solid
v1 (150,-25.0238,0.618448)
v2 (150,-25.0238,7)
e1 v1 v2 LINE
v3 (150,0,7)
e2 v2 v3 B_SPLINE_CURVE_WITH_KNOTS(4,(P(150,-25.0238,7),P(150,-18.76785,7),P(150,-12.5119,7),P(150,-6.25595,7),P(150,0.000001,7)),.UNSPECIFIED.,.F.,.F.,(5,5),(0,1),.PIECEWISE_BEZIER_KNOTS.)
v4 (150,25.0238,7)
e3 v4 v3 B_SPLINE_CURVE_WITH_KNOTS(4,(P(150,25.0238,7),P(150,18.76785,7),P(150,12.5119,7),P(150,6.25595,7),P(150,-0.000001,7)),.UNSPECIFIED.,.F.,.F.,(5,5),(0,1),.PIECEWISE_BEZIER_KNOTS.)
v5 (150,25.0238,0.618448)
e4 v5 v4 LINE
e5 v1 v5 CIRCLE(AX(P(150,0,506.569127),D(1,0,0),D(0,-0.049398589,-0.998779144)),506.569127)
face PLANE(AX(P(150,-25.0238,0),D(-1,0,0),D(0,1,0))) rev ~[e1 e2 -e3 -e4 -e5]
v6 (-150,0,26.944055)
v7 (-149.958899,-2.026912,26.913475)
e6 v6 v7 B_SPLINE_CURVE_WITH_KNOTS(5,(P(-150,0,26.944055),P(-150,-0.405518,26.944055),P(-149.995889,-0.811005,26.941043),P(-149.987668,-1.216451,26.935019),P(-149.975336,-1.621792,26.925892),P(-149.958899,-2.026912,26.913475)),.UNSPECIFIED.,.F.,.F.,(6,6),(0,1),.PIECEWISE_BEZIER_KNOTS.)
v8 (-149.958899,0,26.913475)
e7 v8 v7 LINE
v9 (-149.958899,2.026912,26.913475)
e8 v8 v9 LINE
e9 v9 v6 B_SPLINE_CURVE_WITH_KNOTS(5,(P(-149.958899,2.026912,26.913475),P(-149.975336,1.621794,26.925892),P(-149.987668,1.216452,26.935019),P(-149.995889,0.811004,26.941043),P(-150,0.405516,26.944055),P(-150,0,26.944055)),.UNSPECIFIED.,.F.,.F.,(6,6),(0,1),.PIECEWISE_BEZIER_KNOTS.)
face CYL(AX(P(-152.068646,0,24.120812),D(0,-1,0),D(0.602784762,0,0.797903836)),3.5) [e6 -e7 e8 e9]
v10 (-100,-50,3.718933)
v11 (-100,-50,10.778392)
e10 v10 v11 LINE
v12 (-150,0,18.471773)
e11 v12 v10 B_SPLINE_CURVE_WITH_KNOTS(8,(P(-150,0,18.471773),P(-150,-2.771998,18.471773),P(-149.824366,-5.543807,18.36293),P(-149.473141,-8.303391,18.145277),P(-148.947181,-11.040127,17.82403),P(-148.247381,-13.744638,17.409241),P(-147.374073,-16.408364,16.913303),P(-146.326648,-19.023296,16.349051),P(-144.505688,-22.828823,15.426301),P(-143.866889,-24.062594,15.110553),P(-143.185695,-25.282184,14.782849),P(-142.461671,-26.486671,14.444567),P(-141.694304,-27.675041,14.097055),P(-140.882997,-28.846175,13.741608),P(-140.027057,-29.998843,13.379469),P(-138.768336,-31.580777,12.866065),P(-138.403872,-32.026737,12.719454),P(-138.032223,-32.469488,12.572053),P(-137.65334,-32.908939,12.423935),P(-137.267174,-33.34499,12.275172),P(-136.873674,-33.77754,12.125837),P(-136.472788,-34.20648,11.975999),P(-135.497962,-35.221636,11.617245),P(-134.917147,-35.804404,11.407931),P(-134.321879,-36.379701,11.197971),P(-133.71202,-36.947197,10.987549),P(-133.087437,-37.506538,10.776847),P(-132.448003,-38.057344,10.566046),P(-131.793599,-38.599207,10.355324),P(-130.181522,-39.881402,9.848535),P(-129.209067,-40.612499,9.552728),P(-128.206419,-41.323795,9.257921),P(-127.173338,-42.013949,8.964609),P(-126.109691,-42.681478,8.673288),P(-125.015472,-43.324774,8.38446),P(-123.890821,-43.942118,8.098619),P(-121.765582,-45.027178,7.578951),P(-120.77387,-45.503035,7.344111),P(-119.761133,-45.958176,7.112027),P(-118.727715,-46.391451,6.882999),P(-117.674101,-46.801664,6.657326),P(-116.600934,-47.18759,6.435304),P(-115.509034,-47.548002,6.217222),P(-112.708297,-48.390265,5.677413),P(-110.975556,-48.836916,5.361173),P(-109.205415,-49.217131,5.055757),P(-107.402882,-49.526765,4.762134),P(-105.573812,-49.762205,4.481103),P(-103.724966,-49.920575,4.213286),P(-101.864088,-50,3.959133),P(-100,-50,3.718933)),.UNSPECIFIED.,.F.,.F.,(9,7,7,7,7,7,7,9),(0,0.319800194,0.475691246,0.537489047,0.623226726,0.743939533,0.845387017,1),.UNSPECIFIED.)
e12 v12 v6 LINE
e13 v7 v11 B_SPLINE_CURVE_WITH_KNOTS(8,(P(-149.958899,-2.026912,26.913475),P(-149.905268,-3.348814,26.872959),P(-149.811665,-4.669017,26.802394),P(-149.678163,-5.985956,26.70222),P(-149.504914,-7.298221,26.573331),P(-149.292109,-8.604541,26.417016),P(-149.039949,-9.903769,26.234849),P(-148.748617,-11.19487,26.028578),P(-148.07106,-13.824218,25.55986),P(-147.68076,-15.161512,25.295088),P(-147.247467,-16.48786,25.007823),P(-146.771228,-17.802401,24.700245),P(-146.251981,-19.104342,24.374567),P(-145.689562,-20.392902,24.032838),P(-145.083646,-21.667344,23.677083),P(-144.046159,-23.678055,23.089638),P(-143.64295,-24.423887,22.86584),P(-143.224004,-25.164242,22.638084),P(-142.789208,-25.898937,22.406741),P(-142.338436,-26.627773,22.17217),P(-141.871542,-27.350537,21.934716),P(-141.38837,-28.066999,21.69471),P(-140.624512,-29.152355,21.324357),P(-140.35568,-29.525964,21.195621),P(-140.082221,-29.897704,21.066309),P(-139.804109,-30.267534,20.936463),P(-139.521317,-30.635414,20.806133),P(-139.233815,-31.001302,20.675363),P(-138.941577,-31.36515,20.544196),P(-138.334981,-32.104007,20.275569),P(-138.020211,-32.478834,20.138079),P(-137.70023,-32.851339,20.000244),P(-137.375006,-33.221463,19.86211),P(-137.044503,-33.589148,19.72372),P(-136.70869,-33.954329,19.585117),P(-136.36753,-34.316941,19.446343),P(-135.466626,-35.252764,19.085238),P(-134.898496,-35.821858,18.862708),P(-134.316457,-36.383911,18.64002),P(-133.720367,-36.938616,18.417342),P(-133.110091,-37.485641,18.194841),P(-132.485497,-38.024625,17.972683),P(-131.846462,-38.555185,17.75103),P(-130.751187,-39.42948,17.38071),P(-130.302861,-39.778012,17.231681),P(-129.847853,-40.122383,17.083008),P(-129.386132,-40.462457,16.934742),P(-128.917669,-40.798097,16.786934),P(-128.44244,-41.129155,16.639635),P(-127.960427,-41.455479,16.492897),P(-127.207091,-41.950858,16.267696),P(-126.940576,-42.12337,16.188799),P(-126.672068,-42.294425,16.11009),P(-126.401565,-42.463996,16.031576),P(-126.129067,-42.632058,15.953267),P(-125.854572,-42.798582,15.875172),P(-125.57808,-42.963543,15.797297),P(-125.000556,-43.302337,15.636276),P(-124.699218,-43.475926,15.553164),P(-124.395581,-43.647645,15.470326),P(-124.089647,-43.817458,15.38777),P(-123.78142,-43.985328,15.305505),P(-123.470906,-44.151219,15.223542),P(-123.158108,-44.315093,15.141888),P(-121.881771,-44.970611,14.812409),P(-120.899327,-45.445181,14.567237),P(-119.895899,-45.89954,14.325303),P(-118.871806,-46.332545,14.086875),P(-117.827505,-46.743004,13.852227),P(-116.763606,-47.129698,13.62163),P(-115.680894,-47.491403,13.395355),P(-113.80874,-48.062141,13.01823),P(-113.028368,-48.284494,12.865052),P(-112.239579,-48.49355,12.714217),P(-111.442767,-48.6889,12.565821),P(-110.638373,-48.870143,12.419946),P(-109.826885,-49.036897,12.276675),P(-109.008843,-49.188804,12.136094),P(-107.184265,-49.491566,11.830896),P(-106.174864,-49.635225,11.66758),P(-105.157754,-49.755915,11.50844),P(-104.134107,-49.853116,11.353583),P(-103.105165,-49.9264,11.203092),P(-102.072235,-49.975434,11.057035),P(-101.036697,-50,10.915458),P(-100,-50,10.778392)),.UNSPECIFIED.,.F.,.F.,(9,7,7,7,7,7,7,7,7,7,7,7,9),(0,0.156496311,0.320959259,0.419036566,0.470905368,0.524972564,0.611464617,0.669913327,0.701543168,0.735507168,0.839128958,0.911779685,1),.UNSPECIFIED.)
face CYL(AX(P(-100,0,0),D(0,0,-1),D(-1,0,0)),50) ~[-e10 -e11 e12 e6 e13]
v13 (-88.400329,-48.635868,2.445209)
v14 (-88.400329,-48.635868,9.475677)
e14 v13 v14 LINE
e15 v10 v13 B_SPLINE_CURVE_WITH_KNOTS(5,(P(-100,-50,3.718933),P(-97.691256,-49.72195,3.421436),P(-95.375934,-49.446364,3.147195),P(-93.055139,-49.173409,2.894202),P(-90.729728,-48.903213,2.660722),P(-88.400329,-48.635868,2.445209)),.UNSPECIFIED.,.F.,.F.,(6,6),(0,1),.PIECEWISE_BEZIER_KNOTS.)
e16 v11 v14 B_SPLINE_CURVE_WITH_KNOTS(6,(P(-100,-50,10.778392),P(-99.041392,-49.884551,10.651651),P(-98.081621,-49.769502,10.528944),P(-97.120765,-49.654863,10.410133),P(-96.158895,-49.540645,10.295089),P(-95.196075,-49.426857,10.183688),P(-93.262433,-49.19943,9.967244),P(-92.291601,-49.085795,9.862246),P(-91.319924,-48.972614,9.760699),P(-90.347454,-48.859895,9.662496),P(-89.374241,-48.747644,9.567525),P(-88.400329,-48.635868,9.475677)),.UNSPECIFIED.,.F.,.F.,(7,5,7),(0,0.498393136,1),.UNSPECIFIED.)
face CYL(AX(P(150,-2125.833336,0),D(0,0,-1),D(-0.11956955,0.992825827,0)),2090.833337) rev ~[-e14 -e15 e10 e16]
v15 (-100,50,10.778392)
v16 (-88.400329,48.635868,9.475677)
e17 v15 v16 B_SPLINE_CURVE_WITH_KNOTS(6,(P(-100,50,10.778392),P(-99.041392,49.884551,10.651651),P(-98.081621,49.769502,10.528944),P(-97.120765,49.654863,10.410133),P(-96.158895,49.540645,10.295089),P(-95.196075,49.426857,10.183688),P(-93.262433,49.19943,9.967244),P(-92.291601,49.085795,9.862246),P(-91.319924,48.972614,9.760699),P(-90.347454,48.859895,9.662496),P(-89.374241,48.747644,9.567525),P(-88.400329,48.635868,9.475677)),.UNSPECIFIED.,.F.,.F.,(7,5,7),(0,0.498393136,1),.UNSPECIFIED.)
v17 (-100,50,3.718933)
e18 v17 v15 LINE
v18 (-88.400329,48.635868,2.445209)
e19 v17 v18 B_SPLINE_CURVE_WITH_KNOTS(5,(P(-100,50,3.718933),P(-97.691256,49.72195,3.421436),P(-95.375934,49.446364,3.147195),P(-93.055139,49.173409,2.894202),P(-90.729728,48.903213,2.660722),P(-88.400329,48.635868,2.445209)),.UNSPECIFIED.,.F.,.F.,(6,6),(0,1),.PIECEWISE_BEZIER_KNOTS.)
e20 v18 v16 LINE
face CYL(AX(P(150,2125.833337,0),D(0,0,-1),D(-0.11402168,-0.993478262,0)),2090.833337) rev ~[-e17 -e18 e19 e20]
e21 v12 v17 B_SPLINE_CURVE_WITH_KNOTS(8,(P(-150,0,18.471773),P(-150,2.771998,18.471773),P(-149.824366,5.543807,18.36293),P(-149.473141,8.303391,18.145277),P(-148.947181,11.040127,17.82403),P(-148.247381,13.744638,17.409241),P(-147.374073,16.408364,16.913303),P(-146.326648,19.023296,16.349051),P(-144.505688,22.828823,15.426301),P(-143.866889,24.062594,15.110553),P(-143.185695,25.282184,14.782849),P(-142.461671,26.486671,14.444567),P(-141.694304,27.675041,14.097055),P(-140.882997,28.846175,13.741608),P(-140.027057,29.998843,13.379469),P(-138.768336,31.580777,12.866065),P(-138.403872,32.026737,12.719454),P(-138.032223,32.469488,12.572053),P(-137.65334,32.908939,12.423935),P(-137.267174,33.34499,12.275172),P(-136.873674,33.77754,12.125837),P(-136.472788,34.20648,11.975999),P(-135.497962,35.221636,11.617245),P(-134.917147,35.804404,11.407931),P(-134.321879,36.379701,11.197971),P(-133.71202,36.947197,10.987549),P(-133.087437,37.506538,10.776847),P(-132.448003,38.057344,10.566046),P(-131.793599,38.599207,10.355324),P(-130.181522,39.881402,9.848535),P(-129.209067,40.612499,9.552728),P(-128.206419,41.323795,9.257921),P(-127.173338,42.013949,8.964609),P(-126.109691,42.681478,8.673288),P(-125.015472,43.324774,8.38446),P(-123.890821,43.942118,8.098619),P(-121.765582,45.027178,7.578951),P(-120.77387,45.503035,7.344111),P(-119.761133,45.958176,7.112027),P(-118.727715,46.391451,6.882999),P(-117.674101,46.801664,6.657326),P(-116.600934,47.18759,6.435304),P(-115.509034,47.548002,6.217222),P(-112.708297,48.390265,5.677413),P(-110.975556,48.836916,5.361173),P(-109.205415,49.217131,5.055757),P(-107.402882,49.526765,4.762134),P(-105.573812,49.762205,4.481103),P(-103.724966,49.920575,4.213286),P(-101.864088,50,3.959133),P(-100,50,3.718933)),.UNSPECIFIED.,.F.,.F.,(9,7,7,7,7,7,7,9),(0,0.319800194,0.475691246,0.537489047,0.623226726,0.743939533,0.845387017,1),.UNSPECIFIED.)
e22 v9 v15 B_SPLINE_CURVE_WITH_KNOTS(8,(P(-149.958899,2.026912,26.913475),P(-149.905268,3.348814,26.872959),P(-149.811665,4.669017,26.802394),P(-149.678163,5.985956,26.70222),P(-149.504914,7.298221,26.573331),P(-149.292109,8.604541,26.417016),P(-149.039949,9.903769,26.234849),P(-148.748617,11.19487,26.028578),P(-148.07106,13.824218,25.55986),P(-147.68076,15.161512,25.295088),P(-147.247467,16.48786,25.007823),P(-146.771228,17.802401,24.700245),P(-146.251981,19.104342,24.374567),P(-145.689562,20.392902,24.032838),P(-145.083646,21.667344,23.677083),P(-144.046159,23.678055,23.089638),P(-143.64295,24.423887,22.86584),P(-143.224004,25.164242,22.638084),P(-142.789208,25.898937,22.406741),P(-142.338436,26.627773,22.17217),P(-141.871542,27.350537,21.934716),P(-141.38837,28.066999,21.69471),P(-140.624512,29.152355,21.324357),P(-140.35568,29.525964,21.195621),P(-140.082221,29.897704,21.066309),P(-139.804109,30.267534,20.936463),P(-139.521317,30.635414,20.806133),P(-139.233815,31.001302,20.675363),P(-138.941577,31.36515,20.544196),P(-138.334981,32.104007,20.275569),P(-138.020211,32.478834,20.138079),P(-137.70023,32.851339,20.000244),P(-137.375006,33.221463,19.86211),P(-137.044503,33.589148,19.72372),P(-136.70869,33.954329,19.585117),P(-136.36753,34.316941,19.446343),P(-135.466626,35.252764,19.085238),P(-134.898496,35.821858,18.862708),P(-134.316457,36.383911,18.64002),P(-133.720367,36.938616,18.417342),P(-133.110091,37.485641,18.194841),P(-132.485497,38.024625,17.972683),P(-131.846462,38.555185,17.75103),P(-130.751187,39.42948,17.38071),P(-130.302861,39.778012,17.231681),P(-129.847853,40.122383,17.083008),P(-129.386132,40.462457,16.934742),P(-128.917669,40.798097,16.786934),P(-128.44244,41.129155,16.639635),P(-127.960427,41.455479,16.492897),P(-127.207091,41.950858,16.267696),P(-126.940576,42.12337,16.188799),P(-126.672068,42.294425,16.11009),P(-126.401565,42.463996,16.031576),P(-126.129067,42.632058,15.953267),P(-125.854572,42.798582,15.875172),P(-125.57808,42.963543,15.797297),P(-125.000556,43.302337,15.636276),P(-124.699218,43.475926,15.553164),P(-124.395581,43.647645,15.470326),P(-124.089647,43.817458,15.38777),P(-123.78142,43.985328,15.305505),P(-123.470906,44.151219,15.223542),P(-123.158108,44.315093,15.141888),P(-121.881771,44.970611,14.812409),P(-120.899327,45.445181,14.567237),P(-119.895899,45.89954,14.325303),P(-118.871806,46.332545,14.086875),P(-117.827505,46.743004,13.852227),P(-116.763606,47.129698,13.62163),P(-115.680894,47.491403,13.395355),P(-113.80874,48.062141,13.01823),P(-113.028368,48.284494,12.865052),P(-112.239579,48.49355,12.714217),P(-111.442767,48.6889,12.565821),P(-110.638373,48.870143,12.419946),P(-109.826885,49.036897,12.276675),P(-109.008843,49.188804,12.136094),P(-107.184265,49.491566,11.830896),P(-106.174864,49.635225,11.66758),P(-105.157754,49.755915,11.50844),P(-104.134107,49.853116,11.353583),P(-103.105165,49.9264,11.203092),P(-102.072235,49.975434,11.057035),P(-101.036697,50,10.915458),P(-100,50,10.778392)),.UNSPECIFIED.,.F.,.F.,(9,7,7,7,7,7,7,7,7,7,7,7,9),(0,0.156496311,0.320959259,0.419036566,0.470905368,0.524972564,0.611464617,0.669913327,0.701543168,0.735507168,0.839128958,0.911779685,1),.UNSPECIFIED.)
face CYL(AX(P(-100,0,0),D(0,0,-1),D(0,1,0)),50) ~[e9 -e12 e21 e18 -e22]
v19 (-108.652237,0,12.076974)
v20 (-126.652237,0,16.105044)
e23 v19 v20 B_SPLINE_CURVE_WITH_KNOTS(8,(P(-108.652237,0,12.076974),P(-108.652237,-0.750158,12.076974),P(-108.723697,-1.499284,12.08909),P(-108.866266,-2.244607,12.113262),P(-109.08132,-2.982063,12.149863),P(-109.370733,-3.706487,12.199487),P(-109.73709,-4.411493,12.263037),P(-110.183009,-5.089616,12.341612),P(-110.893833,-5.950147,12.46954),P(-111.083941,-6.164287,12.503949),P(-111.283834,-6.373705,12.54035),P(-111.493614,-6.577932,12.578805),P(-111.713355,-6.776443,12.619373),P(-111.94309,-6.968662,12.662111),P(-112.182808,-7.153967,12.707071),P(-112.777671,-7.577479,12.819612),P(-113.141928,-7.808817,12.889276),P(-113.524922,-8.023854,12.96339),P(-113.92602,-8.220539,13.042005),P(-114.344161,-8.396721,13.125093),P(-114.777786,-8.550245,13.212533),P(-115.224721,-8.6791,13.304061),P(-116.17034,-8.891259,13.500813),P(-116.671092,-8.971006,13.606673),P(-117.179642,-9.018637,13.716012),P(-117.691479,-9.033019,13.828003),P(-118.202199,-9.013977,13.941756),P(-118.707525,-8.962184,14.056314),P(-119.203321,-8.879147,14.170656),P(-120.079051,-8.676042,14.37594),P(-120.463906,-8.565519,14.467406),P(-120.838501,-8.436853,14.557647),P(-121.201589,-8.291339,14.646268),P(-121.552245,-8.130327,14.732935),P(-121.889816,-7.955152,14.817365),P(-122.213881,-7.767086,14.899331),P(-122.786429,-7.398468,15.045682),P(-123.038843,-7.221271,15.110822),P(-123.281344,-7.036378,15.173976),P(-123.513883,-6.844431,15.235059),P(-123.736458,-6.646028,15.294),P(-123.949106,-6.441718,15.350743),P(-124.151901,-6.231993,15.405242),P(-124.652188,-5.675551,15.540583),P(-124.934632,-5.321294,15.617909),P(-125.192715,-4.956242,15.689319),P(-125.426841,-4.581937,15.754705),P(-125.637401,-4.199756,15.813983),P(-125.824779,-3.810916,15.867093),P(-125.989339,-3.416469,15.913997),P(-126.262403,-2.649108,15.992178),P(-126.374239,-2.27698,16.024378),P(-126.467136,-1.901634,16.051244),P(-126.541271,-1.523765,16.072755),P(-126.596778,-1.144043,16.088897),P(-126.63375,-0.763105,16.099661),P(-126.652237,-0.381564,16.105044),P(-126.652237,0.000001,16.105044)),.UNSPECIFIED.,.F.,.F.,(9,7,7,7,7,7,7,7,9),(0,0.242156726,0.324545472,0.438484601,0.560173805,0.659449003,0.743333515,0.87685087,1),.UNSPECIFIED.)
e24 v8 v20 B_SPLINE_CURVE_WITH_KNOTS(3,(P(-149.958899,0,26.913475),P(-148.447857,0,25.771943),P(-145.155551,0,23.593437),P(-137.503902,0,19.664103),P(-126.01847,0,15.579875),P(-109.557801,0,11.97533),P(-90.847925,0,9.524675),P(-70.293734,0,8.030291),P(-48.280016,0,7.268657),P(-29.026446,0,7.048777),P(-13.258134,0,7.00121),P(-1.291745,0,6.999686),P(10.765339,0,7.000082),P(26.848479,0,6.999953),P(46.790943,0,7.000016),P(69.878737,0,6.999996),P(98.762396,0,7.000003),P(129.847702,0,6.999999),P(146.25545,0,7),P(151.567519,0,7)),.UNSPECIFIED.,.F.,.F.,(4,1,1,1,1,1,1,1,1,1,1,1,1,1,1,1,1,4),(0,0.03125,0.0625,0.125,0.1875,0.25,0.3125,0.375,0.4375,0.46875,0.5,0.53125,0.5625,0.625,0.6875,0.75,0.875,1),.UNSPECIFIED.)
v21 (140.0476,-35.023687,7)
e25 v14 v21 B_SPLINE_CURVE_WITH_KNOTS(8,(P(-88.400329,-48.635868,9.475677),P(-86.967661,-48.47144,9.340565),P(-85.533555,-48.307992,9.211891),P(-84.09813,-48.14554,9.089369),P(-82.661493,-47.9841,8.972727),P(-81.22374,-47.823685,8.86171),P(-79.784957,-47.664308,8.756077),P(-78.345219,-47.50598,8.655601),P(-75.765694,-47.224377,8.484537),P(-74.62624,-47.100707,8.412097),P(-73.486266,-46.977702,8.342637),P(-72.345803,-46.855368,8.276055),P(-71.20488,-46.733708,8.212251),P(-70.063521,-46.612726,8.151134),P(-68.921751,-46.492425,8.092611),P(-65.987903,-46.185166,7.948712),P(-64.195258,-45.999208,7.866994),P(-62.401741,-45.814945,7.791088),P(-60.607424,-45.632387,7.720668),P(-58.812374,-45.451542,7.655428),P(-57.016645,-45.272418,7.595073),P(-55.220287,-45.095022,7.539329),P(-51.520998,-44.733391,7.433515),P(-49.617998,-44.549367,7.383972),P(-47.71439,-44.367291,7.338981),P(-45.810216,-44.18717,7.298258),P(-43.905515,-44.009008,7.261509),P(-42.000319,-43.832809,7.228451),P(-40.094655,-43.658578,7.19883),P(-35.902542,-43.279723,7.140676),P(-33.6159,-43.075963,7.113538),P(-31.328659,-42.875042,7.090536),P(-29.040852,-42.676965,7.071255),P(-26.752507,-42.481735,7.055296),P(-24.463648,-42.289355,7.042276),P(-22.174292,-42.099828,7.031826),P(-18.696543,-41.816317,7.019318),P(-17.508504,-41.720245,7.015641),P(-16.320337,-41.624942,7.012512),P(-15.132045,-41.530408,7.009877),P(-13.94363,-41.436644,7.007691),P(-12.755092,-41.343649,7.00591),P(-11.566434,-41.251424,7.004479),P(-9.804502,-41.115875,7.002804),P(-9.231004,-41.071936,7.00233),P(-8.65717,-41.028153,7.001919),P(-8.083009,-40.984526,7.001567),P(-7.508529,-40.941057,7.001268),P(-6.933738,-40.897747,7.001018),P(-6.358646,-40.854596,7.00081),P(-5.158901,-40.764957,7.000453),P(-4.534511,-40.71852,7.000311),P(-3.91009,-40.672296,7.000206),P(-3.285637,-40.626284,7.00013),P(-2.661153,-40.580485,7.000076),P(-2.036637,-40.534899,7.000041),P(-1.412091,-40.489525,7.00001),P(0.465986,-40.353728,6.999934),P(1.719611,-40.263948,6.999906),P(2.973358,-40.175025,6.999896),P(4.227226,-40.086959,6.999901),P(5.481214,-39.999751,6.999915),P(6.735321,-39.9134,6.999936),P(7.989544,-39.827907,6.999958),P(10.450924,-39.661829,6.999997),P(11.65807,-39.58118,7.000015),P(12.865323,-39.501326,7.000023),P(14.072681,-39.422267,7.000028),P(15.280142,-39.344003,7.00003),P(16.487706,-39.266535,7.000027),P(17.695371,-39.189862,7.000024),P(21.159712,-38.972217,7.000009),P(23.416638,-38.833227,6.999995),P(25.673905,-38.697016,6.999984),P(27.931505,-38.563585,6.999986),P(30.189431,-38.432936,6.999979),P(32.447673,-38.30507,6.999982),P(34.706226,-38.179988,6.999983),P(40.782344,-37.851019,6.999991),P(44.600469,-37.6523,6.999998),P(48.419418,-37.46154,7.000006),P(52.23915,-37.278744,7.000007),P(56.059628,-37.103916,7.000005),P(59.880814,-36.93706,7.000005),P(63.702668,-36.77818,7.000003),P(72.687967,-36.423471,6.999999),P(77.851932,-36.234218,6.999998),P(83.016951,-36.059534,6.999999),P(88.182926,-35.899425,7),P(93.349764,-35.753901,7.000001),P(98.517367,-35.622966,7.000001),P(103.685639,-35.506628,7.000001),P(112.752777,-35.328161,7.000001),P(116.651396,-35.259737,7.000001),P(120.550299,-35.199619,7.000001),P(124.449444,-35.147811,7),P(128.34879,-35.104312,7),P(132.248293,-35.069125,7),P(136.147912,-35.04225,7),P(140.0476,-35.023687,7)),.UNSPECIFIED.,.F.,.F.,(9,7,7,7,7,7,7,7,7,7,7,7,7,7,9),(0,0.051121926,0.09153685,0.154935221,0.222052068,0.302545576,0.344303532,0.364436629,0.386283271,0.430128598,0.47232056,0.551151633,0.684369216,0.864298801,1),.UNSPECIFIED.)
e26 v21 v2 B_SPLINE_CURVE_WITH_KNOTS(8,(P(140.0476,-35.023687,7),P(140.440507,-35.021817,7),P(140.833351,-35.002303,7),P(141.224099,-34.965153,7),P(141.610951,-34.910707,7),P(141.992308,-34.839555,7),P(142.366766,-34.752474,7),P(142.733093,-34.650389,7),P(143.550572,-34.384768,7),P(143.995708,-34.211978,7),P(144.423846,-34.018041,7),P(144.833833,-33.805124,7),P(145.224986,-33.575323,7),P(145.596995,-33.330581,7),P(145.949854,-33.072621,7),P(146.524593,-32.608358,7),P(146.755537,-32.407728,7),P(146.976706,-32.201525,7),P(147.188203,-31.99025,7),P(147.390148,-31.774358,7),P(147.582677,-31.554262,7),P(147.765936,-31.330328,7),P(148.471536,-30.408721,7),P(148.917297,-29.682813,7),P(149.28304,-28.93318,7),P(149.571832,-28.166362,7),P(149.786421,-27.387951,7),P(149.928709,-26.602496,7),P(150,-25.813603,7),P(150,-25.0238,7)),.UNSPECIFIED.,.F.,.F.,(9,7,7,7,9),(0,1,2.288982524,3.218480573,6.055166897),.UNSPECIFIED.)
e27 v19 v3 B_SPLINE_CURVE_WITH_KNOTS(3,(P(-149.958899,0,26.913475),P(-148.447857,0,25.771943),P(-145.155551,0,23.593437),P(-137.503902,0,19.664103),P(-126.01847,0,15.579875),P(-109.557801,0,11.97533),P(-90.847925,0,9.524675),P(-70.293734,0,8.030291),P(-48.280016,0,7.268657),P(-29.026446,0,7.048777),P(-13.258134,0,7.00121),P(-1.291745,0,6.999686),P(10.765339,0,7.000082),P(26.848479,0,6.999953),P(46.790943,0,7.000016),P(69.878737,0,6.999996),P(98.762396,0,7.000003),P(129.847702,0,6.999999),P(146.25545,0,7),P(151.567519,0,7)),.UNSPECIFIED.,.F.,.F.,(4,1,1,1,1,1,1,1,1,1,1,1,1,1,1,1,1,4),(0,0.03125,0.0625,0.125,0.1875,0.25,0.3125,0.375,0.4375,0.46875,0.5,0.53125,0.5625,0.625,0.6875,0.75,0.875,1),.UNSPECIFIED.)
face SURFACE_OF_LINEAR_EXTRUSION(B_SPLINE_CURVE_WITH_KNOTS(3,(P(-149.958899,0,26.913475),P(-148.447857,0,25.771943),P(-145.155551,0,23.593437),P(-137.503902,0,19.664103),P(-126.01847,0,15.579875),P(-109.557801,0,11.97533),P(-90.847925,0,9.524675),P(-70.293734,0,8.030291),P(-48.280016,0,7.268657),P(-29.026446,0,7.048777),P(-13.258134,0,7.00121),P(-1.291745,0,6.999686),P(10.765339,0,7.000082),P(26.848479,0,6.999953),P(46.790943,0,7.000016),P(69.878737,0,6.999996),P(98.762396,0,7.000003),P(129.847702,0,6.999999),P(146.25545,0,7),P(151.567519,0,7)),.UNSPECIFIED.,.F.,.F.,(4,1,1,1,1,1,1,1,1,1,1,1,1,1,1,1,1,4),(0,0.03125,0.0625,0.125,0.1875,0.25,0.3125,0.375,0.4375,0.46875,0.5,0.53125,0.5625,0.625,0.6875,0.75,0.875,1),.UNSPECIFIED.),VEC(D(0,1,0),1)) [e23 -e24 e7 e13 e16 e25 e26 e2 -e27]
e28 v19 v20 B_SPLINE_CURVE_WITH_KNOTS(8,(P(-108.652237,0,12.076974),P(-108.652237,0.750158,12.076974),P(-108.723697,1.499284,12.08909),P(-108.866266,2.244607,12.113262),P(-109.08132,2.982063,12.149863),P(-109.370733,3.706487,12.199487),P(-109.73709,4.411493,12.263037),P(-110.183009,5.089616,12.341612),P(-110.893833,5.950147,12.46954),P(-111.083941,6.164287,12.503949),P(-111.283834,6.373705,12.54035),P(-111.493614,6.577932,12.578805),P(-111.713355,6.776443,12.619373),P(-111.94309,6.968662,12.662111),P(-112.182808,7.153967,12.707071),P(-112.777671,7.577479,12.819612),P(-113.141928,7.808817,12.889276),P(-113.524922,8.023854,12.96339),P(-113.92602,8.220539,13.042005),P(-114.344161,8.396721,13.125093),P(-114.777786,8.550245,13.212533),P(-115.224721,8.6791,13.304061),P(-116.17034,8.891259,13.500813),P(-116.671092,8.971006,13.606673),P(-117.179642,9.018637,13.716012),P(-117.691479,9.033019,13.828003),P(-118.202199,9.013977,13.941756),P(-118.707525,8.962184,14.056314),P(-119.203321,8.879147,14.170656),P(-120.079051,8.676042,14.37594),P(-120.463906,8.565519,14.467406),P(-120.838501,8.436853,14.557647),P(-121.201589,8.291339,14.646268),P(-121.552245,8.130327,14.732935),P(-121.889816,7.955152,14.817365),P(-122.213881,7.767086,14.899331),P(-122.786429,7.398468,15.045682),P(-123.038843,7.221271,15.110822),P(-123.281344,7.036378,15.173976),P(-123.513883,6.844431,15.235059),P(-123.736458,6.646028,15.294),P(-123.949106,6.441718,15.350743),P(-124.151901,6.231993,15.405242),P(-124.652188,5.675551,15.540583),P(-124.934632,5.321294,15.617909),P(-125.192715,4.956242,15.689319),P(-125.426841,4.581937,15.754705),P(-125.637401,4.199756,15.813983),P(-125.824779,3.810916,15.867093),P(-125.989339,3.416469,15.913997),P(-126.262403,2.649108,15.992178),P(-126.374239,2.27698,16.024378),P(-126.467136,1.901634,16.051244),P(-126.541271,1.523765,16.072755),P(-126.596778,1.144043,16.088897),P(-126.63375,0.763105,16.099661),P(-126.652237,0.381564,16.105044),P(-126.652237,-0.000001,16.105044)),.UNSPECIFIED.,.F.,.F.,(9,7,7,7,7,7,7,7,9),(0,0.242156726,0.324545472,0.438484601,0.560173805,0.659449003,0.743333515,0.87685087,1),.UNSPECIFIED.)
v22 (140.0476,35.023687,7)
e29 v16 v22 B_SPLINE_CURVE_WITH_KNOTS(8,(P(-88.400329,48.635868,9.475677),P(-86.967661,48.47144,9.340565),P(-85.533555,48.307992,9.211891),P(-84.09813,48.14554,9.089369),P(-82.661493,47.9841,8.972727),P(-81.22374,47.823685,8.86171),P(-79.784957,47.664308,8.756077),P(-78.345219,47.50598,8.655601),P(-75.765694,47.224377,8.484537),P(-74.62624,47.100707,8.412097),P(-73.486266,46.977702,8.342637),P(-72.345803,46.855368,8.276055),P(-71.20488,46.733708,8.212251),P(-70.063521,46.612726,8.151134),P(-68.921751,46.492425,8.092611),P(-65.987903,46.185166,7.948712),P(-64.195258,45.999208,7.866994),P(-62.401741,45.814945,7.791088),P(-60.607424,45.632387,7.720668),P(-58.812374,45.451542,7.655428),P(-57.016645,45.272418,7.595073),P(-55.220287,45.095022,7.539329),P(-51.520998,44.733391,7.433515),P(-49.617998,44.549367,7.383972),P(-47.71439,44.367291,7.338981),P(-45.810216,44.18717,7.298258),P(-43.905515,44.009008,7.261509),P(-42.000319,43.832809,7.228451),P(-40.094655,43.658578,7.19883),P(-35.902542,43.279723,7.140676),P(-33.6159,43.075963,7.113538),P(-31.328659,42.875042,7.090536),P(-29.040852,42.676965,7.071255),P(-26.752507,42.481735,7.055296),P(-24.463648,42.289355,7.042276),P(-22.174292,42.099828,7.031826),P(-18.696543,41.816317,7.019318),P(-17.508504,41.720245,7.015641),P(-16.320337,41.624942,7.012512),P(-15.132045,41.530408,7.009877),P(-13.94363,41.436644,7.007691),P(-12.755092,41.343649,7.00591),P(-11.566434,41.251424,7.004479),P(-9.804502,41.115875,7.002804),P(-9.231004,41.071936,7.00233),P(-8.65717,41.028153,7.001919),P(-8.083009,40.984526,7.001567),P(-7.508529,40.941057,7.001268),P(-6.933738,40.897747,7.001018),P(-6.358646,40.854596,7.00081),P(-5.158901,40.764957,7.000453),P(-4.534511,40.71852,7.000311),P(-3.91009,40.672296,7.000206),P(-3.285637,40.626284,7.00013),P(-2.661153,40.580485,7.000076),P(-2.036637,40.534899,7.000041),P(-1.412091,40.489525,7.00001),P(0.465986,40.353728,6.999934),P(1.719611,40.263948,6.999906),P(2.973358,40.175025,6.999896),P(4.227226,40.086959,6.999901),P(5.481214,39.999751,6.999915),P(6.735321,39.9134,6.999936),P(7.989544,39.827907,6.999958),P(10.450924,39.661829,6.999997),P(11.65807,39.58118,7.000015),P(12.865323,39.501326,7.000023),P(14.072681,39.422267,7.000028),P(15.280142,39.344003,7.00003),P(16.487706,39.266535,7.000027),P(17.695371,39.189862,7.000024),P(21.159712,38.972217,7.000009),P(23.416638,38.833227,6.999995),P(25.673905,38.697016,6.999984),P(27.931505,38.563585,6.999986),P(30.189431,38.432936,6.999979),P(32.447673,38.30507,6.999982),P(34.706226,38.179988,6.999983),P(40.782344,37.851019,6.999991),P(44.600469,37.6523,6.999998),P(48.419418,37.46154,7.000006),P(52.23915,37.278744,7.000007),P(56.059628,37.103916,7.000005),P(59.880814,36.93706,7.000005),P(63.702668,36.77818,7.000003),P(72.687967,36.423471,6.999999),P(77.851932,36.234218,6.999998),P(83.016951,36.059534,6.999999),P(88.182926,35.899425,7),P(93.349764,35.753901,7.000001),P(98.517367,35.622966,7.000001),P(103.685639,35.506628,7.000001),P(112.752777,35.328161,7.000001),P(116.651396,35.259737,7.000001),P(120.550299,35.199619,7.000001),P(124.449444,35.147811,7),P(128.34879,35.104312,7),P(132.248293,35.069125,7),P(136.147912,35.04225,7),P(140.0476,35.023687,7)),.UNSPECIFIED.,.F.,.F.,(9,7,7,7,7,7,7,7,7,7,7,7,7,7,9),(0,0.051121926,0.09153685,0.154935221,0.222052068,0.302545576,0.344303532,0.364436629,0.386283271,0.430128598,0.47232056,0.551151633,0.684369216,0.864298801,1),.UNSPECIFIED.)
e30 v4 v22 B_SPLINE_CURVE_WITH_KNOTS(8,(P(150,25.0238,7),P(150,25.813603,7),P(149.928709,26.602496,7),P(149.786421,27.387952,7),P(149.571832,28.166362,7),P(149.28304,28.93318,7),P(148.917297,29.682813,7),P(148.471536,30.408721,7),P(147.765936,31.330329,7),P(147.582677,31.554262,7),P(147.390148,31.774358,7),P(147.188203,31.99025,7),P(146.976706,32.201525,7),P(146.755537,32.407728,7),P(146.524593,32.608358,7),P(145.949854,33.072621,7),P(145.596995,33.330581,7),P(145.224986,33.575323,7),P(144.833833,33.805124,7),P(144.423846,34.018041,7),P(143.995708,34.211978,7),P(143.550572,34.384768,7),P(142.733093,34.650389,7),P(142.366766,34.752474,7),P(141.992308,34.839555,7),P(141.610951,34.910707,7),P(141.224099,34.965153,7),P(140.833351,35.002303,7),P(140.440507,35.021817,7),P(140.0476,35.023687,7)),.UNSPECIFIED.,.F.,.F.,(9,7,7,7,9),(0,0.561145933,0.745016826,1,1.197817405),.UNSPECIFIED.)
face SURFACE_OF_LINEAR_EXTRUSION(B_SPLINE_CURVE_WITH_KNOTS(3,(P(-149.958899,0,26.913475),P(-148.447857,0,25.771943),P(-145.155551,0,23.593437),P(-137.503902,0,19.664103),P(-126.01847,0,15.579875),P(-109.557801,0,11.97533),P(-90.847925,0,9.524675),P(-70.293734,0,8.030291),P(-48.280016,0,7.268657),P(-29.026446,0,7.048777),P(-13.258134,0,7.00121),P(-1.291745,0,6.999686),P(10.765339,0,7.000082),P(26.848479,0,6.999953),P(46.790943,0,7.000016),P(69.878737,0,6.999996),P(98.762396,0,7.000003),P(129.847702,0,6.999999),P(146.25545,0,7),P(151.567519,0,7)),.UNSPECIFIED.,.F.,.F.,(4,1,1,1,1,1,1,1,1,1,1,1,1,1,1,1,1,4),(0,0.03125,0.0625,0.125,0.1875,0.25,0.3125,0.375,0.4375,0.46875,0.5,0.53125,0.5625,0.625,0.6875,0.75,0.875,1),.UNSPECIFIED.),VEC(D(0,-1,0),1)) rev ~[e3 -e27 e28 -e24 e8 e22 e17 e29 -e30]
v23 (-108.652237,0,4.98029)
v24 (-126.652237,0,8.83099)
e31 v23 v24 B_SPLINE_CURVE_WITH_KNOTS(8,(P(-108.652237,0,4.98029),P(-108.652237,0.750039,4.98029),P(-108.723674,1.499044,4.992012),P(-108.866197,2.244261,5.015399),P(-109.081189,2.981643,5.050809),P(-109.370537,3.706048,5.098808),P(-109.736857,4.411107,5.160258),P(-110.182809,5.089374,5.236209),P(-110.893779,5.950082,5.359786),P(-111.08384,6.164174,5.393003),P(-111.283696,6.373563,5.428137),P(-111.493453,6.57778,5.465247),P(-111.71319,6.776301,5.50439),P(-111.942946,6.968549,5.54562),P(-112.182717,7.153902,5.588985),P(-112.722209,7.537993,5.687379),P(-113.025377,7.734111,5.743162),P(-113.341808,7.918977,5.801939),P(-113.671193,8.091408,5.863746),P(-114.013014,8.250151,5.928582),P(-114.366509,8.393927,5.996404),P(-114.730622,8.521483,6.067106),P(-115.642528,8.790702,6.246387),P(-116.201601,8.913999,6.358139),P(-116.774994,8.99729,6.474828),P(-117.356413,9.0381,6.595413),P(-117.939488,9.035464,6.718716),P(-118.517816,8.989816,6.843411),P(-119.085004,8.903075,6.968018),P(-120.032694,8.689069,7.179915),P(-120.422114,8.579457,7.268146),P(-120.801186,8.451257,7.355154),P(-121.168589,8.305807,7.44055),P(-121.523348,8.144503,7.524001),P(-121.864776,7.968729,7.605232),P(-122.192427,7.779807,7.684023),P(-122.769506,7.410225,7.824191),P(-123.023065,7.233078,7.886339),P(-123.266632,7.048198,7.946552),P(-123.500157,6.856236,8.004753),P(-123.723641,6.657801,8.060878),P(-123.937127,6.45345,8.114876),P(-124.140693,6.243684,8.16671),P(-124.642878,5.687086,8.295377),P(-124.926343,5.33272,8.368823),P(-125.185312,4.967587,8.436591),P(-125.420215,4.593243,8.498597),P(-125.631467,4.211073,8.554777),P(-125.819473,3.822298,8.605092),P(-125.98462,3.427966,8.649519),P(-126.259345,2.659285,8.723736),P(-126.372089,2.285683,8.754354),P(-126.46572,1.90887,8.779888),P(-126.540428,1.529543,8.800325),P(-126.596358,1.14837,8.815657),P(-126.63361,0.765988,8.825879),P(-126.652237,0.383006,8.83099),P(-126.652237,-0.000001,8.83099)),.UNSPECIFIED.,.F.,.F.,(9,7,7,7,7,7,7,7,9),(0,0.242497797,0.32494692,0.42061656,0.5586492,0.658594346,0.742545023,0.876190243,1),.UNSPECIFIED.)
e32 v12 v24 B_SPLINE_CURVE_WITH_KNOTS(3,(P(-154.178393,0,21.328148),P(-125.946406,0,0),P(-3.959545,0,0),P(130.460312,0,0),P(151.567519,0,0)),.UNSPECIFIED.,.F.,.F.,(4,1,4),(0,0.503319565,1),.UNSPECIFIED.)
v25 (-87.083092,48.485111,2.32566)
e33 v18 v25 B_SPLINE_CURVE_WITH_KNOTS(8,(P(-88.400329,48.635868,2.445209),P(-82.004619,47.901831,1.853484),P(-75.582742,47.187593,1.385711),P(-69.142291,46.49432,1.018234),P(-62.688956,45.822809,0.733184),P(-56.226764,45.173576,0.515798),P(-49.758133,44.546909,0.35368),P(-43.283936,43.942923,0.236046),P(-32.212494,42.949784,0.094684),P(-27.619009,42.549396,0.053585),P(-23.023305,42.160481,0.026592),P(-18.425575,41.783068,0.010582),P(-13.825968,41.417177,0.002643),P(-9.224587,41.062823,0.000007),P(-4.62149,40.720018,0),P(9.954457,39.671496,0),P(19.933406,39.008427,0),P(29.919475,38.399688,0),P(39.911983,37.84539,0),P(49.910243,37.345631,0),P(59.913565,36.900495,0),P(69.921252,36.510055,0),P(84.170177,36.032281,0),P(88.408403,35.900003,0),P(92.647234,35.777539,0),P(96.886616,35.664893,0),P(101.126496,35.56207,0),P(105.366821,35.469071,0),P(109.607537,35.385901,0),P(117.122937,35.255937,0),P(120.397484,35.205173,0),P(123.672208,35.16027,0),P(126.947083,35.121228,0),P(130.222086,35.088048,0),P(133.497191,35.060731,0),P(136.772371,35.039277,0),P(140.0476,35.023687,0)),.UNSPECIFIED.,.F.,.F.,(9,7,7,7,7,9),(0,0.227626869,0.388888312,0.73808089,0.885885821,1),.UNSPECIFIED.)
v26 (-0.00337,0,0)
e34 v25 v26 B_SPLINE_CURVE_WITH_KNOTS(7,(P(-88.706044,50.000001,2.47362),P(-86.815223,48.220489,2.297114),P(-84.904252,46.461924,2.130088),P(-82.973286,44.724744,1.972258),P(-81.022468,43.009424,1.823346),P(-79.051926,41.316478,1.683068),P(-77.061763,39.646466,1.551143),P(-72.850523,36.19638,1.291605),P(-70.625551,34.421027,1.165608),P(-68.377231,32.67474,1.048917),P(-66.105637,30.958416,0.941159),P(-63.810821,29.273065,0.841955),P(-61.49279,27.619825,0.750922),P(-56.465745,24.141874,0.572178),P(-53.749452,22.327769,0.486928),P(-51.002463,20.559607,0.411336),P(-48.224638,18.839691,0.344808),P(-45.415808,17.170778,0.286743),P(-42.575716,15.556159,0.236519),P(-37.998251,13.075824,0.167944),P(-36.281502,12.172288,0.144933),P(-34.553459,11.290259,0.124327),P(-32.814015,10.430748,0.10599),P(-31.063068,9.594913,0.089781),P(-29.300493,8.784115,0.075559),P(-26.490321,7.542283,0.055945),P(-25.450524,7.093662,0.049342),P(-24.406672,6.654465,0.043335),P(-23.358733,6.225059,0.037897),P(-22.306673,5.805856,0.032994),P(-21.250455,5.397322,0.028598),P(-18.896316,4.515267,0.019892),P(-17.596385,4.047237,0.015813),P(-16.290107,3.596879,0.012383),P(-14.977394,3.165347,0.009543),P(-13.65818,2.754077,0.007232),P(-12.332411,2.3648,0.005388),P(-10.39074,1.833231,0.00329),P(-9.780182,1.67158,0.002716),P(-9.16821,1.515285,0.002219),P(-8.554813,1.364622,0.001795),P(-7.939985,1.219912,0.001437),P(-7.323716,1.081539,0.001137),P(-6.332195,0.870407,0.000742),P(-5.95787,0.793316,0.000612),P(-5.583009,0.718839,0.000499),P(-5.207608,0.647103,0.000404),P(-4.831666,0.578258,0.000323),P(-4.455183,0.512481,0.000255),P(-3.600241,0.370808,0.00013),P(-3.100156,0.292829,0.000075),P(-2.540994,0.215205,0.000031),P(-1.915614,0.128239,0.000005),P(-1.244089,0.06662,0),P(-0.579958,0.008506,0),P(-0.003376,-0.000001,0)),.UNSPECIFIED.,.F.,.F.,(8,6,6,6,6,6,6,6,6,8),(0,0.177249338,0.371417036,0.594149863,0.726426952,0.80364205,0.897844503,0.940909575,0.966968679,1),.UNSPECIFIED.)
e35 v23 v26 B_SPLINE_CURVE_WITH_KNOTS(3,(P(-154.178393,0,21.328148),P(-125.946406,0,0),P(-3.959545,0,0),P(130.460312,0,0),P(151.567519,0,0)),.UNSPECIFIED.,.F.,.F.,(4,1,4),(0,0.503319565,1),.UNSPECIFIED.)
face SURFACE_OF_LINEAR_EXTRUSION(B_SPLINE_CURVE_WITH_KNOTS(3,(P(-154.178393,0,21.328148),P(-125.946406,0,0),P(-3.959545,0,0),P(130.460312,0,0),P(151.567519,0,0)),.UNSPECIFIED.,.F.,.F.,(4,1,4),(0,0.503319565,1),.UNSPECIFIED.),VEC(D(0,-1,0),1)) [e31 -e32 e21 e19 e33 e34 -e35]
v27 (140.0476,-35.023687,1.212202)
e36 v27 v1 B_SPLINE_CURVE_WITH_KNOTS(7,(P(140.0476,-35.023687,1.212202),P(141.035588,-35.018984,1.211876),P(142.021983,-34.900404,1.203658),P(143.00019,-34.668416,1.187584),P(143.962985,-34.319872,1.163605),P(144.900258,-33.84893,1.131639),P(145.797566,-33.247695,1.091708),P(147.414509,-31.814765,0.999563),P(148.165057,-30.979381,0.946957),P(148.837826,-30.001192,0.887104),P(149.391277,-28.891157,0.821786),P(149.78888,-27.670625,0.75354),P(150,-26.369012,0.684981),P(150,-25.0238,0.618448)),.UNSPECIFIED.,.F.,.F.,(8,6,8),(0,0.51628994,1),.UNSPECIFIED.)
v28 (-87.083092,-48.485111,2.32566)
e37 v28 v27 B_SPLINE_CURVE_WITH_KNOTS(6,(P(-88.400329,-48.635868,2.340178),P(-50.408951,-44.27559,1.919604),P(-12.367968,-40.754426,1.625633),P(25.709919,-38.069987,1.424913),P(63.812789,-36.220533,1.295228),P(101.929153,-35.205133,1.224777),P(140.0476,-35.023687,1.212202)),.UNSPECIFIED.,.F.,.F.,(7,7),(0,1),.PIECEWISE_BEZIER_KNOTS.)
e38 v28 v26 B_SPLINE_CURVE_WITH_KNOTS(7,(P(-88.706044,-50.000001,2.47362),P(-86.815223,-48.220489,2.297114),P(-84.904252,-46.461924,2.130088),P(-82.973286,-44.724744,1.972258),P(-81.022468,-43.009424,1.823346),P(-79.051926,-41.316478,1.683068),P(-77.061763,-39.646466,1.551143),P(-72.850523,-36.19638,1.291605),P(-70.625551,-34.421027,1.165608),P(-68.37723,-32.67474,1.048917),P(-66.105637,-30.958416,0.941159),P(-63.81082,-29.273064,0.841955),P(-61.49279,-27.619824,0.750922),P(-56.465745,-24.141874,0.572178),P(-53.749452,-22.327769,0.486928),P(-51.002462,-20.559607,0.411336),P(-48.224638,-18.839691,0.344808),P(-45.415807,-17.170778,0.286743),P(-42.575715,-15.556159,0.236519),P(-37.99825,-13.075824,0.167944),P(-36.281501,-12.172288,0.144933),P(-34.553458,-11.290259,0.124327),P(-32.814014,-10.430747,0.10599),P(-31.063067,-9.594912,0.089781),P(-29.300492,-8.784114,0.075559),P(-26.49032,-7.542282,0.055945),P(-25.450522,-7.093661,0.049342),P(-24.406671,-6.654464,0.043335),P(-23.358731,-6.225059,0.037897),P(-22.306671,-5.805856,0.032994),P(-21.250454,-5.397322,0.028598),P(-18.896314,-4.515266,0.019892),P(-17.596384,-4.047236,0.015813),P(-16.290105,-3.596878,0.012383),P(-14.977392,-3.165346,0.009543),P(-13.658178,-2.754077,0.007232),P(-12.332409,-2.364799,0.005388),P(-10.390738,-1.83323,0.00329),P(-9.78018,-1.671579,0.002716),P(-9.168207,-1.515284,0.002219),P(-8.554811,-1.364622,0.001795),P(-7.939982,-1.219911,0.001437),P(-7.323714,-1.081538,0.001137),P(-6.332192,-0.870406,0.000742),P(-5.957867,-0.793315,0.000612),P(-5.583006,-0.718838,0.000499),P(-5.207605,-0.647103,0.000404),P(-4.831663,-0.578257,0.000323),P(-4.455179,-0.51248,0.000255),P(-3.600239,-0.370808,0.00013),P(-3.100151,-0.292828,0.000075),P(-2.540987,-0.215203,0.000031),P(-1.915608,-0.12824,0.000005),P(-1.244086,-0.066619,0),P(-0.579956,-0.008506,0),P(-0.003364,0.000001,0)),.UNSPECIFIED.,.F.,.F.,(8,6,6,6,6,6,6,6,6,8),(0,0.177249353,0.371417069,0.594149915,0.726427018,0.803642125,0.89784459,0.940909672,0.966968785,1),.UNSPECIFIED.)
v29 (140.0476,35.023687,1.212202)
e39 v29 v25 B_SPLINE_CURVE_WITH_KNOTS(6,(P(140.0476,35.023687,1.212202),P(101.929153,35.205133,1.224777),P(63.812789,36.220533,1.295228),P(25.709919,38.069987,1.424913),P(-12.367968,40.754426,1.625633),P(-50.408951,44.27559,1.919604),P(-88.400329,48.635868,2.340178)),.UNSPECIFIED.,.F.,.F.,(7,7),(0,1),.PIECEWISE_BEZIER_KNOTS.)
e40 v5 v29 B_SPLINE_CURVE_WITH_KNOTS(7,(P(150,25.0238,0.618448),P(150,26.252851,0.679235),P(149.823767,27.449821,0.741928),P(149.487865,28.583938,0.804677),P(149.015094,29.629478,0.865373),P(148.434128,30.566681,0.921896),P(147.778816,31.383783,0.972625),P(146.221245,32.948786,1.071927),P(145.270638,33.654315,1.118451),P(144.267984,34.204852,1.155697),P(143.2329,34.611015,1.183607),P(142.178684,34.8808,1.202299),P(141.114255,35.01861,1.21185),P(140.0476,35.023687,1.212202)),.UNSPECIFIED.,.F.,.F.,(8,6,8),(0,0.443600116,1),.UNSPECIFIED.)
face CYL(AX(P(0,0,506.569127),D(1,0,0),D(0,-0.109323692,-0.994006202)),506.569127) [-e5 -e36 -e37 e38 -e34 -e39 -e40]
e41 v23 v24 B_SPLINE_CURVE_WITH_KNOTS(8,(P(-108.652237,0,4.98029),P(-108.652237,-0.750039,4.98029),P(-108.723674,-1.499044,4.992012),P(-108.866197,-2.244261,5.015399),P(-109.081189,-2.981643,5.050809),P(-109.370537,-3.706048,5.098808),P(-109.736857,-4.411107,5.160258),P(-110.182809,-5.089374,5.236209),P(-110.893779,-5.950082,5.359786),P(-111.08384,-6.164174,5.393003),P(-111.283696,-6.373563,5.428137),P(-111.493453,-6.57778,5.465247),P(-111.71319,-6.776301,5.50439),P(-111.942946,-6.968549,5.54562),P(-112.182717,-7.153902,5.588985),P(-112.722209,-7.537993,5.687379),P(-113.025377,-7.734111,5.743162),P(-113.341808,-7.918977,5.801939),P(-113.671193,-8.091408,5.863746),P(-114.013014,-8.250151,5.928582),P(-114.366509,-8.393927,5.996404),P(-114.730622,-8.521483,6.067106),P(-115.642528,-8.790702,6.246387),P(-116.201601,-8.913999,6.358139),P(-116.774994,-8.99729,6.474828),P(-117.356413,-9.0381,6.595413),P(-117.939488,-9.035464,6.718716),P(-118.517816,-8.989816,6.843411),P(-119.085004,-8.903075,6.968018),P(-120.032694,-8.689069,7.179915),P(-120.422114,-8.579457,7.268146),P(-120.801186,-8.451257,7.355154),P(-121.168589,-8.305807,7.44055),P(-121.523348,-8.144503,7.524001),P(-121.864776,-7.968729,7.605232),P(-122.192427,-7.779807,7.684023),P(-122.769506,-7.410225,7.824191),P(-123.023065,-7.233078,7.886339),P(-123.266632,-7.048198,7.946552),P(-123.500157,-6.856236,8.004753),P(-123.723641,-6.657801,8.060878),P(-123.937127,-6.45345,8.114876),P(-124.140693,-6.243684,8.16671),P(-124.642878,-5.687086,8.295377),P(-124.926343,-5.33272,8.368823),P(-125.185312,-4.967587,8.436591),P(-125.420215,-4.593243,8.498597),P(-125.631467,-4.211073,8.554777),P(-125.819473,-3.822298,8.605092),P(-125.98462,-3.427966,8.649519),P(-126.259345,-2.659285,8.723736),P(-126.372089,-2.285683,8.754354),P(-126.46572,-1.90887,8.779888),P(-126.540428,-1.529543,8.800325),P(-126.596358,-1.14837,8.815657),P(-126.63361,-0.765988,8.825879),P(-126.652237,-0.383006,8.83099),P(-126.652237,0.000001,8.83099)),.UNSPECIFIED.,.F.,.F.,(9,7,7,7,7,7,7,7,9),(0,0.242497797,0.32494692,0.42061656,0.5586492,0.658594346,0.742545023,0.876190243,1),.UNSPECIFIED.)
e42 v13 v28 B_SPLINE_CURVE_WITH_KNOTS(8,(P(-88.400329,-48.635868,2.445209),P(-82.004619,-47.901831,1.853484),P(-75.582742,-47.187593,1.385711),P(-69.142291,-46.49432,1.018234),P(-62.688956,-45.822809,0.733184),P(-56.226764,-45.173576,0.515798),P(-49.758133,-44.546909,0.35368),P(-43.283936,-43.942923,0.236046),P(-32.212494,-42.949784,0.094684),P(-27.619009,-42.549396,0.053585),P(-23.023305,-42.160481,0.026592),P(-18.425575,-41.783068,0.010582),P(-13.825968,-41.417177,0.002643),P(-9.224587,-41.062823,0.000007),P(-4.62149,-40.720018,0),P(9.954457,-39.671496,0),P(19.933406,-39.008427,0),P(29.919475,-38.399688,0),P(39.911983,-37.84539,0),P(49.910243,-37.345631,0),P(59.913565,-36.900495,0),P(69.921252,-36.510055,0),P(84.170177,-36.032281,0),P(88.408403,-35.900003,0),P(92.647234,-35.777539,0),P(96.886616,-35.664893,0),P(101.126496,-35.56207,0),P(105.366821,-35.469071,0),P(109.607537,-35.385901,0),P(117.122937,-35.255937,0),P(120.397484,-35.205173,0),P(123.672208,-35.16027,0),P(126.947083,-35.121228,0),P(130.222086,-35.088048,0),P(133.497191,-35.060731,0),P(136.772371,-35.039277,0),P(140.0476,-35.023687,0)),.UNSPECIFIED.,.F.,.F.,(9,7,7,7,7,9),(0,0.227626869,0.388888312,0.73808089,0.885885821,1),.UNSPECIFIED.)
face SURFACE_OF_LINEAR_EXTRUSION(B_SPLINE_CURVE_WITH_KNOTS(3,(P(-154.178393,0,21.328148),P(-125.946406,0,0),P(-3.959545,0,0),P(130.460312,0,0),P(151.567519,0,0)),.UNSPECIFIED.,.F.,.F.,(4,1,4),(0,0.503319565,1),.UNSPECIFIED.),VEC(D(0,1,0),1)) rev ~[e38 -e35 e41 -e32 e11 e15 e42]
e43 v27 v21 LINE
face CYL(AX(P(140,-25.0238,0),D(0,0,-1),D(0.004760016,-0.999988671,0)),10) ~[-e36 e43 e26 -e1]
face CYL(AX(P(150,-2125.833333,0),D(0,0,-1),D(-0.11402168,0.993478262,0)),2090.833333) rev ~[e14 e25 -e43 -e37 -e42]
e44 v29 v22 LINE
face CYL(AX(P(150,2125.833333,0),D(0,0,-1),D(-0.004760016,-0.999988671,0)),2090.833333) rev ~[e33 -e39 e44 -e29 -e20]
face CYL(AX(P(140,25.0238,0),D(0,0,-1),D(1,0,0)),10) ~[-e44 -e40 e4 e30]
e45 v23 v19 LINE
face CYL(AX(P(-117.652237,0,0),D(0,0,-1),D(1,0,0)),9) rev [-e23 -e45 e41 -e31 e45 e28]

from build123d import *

# Parameters (mm, degrees)
F2_DEPTH = 50
F0_R     = 9
F3_DEPTH = 41
F5_DEPTH = 150


# Not quite as in the source:
# - the dataset's text gives a spline's control points without its knots; the knots are read off the source's solid


with BuildPart() as f2:
    # F1 (on Front) → F2 (new body, symmetric)
    with BuildSketch(Plane.XZ):
        with BuildLine():
            ThreePointArc((-149.9588993892, 26.9134754342), (-154.8613095864, 26.2305586605), (-154.1783928127, 21.3281484633))
            add(Edge.make_bspline(
                [(-154.1783928127, 21.3281484633), (-125.9464059615, 0), (-3.9595449586, 0), (130.4603123693, 0), (151.5675187111, 0)],
                knots=[0, 0, 0, 0, 0.5033195654, 1, 1, 1, 1], degree=3))
            ThreePointArc((151.5675187111, 0), (155.0675187869, 3.5000000758), (151.5675187111, 7.0000001516))
            add(Edge.make_bspline(
                [(-149.9588993892, 26.9134754342), (-148.4478574546, 25.7719430693), (-145.1555512603, 23.5934371829), (-137.5039021405, 19.6641031988), (-126.0184700843, 15.5798750303), (-109.5578013858, 11.9753296087), (-90.8479253185, 9.5246754809), (-70.2937339258, 8.030291433), (-48.2800158692, 7.2686571064), (-29.0264464578, 7.0487772943), (-13.2581336189, 7.0012099028), (-1.291744917, 6.9996863373), (10.7653391732, 7.0000823662), (26.8484793874, 6.9999526881), (46.7909432723, 7.0000162503), (69.87873725, 6.9999959326), (98.7623960141, 7.0000025942), (129.847702251, 6.9999992634), (146.255449604, 7.0000001516), (151.5675187111, 7.0000001516)],
                knots=[0, 0, 0, 0, 0.03125, 0.0625, 0.125, 0.1875, 0.25, 0.3125, 0.375, 0.4375, 0.46875, 0.5, 0.53125, 0.5625, 0.625, 0.6875, 0.75, 0.875, 1, 1, 1, 1], degree=3))
        make_face()
    extrude(amount=F2_DEPTH, both=True)

    # F0 (on Top) → F3 (intersect)
    with BuildSketch(Plane.XY):
        with BuildLine():
            ThreePointArc((-150, 0), (-135.3553390593, -35.3553390593), (-100, -50))
            ThreePointArc((-100, -50), (-94.2011170994, -49.3098342645), (-88.4003291499, -48.635867795))
            ThreePointArc((-88.4003291499, -48.635867795), (-60.7572711034, -30.9839995602), (-50, 0))
            ThreePointArc((-50, 0), (-60.7572711034, 30.9839995602), (-88.4003291499, 48.635867795))
            ThreePointArc((-88.4003291499, 48.635867795), (-94.2011170994, 49.3098342645), (-100, 50))
            ThreePointArc((-100, 50), (-135.3553390593, 35.3553390593), (-150, 0))
        make_face()
        with Locations((-117.6522374153, 0)):
            Circle(F0_R, mode=Mode.SUBTRACT)
        with BuildLine():
            ThreePointArc((140.0476001587, -35.0236869248), (147.0878770301, -32.0780187539), (150, -25.0238002141))
            Line((150, -25.0238002141), (150, 0))
            Line((150, 0), (150, 25.0238002141))
            ThreePointArc((150, 25.0238002141), (147.0878770301, 32.0780187539), (140.0476001587, 35.0236869248))
            ThreePointArc((140.0476001587, 35.0236869248), (25.6372549098, 38.7018244409), (-88.4003291499, 48.635867795))
            ThreePointArc((-88.4003291499, 48.635867795), (-60.7572711034, 30.9839995602), (-50, 0))
            ThreePointArc((-50, 0), (-60.7572711034, -30.9839995602), (-88.4003291499, -48.635867795))
            ThreePointArc((-88.4003291499, -48.635867795), (25.6372549098, -38.7018244409), (140.0476001587, -35.0236869248))
        make_face()
    extrude(amount=F3_DEPTH, mode=Mode.INTERSECT)

    # F4 (on Right) → F5 (intersect, symmetric)
    with BuildSketch(Plane.YZ):
        with BuildLine():
            Line((-52.1002963765, 32.8564588929), (-55.3800071338, 3.0362728213))
            ThreePointArc((-55.3800071338, 3.0362728213), (0, 0), (55.3800071338, 3.0362728213))
            Line((55.3800071338, 3.0362728213), (52.1002963765, 32.8564588929))
            ThreePointArc((52.1002963765, 32.8564588929), (0, 30), (-52.1002963765, 32.8564588929))
        make_face()
    extrude(amount=F5_DEPTH, both=True, mode=Mode.INTERSECT)


solid = f2.part
